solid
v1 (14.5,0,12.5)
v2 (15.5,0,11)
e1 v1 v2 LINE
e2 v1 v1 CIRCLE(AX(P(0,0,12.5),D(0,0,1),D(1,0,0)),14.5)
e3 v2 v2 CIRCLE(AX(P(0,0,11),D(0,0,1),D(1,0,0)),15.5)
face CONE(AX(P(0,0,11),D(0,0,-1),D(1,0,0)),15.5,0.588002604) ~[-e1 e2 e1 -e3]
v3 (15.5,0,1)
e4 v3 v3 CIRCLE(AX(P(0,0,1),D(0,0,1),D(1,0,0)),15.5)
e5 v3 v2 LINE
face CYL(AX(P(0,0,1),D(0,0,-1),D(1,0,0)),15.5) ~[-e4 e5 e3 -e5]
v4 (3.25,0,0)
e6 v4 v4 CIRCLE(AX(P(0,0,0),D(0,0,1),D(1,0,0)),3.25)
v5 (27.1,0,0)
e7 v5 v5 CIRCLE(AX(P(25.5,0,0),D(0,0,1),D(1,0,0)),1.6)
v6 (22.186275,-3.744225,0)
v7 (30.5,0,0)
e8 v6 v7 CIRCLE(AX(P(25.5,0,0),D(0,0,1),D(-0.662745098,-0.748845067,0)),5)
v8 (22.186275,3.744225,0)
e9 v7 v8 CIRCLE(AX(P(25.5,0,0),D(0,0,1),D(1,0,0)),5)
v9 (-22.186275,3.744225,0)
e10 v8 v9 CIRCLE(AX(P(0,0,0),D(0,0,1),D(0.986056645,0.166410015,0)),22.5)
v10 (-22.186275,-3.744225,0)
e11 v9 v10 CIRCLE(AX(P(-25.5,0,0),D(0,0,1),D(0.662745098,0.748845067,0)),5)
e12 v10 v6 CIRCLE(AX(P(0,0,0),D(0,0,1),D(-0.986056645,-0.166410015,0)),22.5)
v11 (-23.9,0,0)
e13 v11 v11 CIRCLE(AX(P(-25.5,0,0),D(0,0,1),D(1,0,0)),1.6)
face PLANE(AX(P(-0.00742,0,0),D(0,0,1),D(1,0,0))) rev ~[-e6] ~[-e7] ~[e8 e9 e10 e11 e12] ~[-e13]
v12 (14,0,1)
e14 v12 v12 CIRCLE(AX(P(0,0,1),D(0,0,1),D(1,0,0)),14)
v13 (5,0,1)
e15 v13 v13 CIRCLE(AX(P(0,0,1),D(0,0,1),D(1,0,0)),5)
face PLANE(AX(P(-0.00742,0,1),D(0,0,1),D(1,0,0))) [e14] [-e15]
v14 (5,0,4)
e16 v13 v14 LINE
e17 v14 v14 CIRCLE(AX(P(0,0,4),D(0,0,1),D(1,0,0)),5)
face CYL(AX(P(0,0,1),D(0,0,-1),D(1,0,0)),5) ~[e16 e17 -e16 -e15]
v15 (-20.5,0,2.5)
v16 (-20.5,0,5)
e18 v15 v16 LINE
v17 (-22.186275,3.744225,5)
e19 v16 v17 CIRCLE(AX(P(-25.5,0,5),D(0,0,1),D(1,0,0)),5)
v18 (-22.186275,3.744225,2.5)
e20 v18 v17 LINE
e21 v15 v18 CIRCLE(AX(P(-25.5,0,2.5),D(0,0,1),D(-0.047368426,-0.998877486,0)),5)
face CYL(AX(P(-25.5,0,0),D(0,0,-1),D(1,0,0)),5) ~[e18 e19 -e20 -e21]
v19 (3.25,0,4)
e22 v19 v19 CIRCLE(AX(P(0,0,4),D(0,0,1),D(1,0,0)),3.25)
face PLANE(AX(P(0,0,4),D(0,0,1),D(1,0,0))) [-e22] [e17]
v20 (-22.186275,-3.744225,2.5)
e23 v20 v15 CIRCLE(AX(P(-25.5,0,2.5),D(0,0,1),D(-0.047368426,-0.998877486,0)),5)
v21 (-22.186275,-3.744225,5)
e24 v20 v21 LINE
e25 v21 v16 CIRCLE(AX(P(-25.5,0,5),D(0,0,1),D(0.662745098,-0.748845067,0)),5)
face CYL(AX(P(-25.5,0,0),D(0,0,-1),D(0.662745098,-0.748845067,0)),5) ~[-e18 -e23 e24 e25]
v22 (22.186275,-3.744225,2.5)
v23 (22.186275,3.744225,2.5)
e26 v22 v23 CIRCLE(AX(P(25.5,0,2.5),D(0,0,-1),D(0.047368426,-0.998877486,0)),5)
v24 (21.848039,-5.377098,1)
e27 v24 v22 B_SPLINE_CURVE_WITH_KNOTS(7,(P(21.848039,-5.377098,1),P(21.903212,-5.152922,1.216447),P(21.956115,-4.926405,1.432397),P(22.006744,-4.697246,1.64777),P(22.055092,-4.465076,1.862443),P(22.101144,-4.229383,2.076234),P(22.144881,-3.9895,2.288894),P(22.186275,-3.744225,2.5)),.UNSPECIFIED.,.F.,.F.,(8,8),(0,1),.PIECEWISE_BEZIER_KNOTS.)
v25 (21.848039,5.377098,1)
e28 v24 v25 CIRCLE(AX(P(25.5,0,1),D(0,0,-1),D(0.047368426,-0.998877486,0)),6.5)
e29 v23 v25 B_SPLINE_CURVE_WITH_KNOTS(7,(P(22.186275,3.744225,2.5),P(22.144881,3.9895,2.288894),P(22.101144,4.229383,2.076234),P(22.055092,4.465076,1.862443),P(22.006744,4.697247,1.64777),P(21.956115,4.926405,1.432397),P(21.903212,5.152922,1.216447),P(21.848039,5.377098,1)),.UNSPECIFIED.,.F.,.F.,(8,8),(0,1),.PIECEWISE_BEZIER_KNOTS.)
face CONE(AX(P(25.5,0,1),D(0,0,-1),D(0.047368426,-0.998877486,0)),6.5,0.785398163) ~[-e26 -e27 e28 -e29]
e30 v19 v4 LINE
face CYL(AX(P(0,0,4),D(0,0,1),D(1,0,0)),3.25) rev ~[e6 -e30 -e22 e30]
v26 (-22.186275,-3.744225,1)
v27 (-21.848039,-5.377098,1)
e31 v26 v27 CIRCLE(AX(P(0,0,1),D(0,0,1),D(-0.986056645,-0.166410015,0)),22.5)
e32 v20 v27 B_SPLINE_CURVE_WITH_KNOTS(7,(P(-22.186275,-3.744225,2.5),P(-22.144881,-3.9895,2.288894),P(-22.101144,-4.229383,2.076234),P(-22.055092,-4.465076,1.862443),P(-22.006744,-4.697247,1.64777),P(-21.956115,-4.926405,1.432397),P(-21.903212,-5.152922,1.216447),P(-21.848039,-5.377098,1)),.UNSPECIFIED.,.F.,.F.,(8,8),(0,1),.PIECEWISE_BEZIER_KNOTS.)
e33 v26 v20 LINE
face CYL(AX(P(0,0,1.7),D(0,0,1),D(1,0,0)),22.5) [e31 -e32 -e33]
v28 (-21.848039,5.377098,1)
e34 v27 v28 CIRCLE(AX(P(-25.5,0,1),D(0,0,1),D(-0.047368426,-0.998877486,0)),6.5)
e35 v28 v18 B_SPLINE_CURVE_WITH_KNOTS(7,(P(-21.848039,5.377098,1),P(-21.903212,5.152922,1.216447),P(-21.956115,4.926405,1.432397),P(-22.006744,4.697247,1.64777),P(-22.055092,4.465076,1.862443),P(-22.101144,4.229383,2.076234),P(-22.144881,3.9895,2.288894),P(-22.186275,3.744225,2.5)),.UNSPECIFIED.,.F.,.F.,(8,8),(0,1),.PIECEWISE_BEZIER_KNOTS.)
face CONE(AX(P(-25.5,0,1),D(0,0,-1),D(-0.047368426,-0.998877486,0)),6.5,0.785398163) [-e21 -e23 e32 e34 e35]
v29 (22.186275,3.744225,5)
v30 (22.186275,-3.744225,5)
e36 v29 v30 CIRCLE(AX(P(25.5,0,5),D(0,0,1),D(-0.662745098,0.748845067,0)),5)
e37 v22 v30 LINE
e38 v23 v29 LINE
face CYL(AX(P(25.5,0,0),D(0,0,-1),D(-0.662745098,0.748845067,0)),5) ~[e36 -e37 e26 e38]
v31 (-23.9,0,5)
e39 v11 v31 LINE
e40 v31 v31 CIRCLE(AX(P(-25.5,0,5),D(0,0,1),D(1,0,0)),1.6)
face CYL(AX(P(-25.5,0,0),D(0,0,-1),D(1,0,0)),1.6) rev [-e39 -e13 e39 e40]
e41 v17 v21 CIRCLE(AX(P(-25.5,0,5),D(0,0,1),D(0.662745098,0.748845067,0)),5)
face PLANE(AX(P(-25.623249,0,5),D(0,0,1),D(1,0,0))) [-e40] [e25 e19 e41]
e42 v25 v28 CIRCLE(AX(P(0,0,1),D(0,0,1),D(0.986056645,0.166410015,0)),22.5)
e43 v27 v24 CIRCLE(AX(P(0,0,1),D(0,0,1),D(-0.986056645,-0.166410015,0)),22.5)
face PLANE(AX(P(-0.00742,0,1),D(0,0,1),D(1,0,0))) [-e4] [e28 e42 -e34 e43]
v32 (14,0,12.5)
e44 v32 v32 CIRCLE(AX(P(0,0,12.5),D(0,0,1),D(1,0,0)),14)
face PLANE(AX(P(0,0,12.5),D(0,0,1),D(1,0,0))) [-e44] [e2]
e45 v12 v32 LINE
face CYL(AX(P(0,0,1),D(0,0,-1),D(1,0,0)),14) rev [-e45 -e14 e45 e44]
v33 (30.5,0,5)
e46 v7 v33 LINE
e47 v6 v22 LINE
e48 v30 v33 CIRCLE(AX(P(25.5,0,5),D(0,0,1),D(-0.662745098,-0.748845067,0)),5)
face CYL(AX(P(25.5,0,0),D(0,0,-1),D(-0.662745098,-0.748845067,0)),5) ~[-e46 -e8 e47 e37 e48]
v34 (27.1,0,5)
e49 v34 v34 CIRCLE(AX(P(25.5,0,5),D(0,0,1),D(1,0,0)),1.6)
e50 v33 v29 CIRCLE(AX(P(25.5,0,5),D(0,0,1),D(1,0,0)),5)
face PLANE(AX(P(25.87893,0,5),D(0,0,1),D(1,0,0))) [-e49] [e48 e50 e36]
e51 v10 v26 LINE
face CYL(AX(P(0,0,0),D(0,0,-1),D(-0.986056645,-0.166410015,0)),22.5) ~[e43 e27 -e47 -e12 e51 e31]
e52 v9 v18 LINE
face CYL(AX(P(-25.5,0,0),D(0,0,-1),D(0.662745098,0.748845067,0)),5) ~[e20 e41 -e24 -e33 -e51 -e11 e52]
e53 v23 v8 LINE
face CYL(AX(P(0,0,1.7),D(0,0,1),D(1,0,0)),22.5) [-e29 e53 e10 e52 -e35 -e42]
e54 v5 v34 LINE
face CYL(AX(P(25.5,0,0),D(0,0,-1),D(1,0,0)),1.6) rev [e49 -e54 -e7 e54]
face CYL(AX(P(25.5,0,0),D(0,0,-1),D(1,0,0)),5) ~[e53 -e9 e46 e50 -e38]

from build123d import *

# Parameters (mm, degrees)
F0_R         = 1.6
F1_DEPTH     = 5
F2_DEPTH     = 1
F3_R         = 15.5
F3_R_2       = 14
F4_DEPTH     = 11.5
F5_SIZE2     = 1.5
F5_SIZE      = 1
F8_T4_ANGLE  = 185.4300536725
F8_S5_R      = 22.5
F8_T6_DEPTH  = 9
F8_T10_ANGLE = 185.4300536725
F8_S11_R     = 22.5
F8_T12_DEPTH = 9
F9_R         = 5
F10_DEPTH    = 3
F11_R        = 3.25
F12_DEPTH    = 5


# Not quite as in the source:
# - a fillet or chamfer that OpenCascade refuses, or shapes differently, is made with other operations: its cross-section is extruded or revolved along the edge and cut away or added
# - a feature of the source that left no trace in its solid (it failed there, or was rolled back) is left out


with BuildPart() as f1:
    # F0 (on Top) → F1 (new body)
    with BuildSketch(Plane.XY):
        with BuildLine():
            ThreePointArc((-22.1862745098, -3.7442253372), (-22.5, 0), (-22.1862745098, 3.7442253372))
            ThreePointArc((-22.1862745098, 3.7442253372), (-30.5, 0), (-22.1862745098, -3.7442253372))
        make_face()
        with Locations((-25.5, 0)):
            Circle(F0_R, mode=Mode.SUBTRACT)
        with BuildLine():
            ThreePointArc((-20.5, 0), (-20.9410183456, 2.0532136456), (-22.1862745098, 3.7442253372))
            ThreePointArc((-22.1862745098, 3.7442253372), (-22.5, 0), (-22.1862745098, -3.7442253372))
            ThreePointArc((-22.1862745098, -3.7442253372), (-20.9410183456, -2.0532136456), (-20.5, 0))
        make_face()
    extrude(amount=F1_DEPTH)



with BuildPart() as f1b:
    # F0 (on Top) → F1, piece 2 (new body)
    with BuildSketch(Plane.XY):
        with BuildLine():
            ThreePointArc((22.1862745098, 3.7442253372), (22.4214314493, 1.8786728733), (22.5, 0))
            ThreePointArc((22.5, 0), (22.4214314493, -1.8786728733), (22.1862745098, -3.7442253372))
            ThreePointArc((22.1862745098, -3.7442253372), (27.5532136456, -4.5589816544), (30.5, 0))
            ThreePointArc((30.5, 0), (27.5532136456, 4.5589816544), (22.1862745098, 3.7442253372))
        make_face()
        with Locations((25.5, 0)):
            Circle(F0_R, mode=Mode.SUBTRACT)
        with BuildLine():
            ThreePointArc((22.1862745098, -3.7442253372), (22.4214314493, -1.8786728733), (22.5, 0))
            ThreePointArc((22.5, 0), (22.4214314493, 1.8786728733), (22.1862745098, 3.7442253372))
            ThreePointArc((22.1862745098, 3.7442253372), (20.5, 0), (22.1862745098, -3.7442253372))
        make_face()
    extrude(amount=F1_DEPTH)


with BuildPart() as f1_1:
    add(f1.part)

    add(f1b.part)  # F2 merges F1b
    # F0 (on Top) → F2 (join)
    with BuildSketch(Plane.XY):
        with BuildLine():
            ThreePointArc((22.1862745098, -3.7442253372), (20.5, 0), (22.1862745098, 3.7442253372))
            ThreePointArc((22.1862745098, 3.7442253372), (0, 22.5), (-22.1862745098, 3.7442253372))
            ThreePointArc((-22.1862745098, 3.7442253372), (-20.9410183456, 2.0532136456), (-20.5, 0))
            ThreePointArc((-20.5, 0), (-20.9410183456, -2.0532136456), (-22.1862745098, -3.7442253372))
            ThreePointArc((-22.1862745098, -3.7442253372), (0, -22.5), (22.1862745098, -3.7442253372))
        make_face()
    extrude(amount=F2_DEPTH)

    # F3 (on face) → F4 (join)
    with BuildSketch(Plane.XY.offset(1)):
        Circle(F3_R)
        Circle(F3_R_2, mode=Mode.SUBTRACT)
    extrude(amount=F4_DEPTH)

    # F5
    f5_edges = [f1_1.edges().sort_by_distance(p)[0] for p in [
        (-15.5, 0, 12.5),
    ]]
    f5_side = f1_1.faces().sort_by_distance((-15.061594, 0, 12.5))[0]
    chamfer(f5_edges, length=F5_SIZE, length2=F5_SIZE2, reference=f5_side)

    # F8: chamfer of 1.5 on 2 edges, made by hand


with BuildPart() as f8_tool2:
    # F8_s3 → F8_t4 (revolve)
    with BuildSketch(Plane(origin=(25.4427839223, 1.2065389767, 0), x_dir=(0, 0, 1), z_dir=(0.9988774861, 0.0473684257, 0))):
        Polygon((1, 7.7078948555), (2.5, 6.2078948555), (1, 6.2078948555), align=None)
    revolve(axis=Axis((25.5, 0, 1), (0, 0, -1)), revolution_arc=F8_T4_ANGLE)

    # F8_s5 → F8_t6 (intersect, symmetric)
    with BuildSketch(Plane.XY.offset(1.8)):
        Circle(F8_S5_R)
    extrude(amount=F8_T6_DEPTH, both=True, mode=Mode.INTERSECT)


with BuildPart() as f1_2:
    add(f1_1.part)

    # F8_t1: union F8_tool2
    add(f8_tool2.part)


with BuildPart() as f8_tool8:
    # F8_s9 → F8_t10 (revolve)
    with BuildSketch(Plane(origin=(-25.4427839223, 1.2065389767, 0), x_dir=(0, 0, 1), z_dir=(-0.9988774861, 0.0473684257, 0))):
        Polygon((1, -7.7078948555), (2.5, -6.2078948555), (1, -6.2078948555), align=None)
    revolve(axis=Axis((-25.5, 0, 1), (0, 0, 1)), revolution_arc=F8_T10_ANGLE)

    # F8_s11 → F8_t12 (intersect, symmetric)
    with BuildSketch(Plane.XY.offset(1.7)):
        Circle(F8_S11_R)
    extrude(amount=F8_T12_DEPTH, both=True, mode=Mode.INTERSECT)


with BuildPart() as f1_3:
    add(f1_2.part)

    # F8_t7: union F8_tool8
    add(f8_tool8.part)

    # F9 (on face) → F10 (join)
    with BuildSketch(Plane.XY.offset(1)):
        Circle(F9_R)
    extrude(amount=F10_DEPTH)

    # F11 (on face) → F12 (cut)
    with BuildSketch(Plane.XY.offset(4)):
        Circle(F11_R)
    extrude(amount=-F12_DEPTH, mode=Mode.SUBTRACT)


solid = f1_3.part
